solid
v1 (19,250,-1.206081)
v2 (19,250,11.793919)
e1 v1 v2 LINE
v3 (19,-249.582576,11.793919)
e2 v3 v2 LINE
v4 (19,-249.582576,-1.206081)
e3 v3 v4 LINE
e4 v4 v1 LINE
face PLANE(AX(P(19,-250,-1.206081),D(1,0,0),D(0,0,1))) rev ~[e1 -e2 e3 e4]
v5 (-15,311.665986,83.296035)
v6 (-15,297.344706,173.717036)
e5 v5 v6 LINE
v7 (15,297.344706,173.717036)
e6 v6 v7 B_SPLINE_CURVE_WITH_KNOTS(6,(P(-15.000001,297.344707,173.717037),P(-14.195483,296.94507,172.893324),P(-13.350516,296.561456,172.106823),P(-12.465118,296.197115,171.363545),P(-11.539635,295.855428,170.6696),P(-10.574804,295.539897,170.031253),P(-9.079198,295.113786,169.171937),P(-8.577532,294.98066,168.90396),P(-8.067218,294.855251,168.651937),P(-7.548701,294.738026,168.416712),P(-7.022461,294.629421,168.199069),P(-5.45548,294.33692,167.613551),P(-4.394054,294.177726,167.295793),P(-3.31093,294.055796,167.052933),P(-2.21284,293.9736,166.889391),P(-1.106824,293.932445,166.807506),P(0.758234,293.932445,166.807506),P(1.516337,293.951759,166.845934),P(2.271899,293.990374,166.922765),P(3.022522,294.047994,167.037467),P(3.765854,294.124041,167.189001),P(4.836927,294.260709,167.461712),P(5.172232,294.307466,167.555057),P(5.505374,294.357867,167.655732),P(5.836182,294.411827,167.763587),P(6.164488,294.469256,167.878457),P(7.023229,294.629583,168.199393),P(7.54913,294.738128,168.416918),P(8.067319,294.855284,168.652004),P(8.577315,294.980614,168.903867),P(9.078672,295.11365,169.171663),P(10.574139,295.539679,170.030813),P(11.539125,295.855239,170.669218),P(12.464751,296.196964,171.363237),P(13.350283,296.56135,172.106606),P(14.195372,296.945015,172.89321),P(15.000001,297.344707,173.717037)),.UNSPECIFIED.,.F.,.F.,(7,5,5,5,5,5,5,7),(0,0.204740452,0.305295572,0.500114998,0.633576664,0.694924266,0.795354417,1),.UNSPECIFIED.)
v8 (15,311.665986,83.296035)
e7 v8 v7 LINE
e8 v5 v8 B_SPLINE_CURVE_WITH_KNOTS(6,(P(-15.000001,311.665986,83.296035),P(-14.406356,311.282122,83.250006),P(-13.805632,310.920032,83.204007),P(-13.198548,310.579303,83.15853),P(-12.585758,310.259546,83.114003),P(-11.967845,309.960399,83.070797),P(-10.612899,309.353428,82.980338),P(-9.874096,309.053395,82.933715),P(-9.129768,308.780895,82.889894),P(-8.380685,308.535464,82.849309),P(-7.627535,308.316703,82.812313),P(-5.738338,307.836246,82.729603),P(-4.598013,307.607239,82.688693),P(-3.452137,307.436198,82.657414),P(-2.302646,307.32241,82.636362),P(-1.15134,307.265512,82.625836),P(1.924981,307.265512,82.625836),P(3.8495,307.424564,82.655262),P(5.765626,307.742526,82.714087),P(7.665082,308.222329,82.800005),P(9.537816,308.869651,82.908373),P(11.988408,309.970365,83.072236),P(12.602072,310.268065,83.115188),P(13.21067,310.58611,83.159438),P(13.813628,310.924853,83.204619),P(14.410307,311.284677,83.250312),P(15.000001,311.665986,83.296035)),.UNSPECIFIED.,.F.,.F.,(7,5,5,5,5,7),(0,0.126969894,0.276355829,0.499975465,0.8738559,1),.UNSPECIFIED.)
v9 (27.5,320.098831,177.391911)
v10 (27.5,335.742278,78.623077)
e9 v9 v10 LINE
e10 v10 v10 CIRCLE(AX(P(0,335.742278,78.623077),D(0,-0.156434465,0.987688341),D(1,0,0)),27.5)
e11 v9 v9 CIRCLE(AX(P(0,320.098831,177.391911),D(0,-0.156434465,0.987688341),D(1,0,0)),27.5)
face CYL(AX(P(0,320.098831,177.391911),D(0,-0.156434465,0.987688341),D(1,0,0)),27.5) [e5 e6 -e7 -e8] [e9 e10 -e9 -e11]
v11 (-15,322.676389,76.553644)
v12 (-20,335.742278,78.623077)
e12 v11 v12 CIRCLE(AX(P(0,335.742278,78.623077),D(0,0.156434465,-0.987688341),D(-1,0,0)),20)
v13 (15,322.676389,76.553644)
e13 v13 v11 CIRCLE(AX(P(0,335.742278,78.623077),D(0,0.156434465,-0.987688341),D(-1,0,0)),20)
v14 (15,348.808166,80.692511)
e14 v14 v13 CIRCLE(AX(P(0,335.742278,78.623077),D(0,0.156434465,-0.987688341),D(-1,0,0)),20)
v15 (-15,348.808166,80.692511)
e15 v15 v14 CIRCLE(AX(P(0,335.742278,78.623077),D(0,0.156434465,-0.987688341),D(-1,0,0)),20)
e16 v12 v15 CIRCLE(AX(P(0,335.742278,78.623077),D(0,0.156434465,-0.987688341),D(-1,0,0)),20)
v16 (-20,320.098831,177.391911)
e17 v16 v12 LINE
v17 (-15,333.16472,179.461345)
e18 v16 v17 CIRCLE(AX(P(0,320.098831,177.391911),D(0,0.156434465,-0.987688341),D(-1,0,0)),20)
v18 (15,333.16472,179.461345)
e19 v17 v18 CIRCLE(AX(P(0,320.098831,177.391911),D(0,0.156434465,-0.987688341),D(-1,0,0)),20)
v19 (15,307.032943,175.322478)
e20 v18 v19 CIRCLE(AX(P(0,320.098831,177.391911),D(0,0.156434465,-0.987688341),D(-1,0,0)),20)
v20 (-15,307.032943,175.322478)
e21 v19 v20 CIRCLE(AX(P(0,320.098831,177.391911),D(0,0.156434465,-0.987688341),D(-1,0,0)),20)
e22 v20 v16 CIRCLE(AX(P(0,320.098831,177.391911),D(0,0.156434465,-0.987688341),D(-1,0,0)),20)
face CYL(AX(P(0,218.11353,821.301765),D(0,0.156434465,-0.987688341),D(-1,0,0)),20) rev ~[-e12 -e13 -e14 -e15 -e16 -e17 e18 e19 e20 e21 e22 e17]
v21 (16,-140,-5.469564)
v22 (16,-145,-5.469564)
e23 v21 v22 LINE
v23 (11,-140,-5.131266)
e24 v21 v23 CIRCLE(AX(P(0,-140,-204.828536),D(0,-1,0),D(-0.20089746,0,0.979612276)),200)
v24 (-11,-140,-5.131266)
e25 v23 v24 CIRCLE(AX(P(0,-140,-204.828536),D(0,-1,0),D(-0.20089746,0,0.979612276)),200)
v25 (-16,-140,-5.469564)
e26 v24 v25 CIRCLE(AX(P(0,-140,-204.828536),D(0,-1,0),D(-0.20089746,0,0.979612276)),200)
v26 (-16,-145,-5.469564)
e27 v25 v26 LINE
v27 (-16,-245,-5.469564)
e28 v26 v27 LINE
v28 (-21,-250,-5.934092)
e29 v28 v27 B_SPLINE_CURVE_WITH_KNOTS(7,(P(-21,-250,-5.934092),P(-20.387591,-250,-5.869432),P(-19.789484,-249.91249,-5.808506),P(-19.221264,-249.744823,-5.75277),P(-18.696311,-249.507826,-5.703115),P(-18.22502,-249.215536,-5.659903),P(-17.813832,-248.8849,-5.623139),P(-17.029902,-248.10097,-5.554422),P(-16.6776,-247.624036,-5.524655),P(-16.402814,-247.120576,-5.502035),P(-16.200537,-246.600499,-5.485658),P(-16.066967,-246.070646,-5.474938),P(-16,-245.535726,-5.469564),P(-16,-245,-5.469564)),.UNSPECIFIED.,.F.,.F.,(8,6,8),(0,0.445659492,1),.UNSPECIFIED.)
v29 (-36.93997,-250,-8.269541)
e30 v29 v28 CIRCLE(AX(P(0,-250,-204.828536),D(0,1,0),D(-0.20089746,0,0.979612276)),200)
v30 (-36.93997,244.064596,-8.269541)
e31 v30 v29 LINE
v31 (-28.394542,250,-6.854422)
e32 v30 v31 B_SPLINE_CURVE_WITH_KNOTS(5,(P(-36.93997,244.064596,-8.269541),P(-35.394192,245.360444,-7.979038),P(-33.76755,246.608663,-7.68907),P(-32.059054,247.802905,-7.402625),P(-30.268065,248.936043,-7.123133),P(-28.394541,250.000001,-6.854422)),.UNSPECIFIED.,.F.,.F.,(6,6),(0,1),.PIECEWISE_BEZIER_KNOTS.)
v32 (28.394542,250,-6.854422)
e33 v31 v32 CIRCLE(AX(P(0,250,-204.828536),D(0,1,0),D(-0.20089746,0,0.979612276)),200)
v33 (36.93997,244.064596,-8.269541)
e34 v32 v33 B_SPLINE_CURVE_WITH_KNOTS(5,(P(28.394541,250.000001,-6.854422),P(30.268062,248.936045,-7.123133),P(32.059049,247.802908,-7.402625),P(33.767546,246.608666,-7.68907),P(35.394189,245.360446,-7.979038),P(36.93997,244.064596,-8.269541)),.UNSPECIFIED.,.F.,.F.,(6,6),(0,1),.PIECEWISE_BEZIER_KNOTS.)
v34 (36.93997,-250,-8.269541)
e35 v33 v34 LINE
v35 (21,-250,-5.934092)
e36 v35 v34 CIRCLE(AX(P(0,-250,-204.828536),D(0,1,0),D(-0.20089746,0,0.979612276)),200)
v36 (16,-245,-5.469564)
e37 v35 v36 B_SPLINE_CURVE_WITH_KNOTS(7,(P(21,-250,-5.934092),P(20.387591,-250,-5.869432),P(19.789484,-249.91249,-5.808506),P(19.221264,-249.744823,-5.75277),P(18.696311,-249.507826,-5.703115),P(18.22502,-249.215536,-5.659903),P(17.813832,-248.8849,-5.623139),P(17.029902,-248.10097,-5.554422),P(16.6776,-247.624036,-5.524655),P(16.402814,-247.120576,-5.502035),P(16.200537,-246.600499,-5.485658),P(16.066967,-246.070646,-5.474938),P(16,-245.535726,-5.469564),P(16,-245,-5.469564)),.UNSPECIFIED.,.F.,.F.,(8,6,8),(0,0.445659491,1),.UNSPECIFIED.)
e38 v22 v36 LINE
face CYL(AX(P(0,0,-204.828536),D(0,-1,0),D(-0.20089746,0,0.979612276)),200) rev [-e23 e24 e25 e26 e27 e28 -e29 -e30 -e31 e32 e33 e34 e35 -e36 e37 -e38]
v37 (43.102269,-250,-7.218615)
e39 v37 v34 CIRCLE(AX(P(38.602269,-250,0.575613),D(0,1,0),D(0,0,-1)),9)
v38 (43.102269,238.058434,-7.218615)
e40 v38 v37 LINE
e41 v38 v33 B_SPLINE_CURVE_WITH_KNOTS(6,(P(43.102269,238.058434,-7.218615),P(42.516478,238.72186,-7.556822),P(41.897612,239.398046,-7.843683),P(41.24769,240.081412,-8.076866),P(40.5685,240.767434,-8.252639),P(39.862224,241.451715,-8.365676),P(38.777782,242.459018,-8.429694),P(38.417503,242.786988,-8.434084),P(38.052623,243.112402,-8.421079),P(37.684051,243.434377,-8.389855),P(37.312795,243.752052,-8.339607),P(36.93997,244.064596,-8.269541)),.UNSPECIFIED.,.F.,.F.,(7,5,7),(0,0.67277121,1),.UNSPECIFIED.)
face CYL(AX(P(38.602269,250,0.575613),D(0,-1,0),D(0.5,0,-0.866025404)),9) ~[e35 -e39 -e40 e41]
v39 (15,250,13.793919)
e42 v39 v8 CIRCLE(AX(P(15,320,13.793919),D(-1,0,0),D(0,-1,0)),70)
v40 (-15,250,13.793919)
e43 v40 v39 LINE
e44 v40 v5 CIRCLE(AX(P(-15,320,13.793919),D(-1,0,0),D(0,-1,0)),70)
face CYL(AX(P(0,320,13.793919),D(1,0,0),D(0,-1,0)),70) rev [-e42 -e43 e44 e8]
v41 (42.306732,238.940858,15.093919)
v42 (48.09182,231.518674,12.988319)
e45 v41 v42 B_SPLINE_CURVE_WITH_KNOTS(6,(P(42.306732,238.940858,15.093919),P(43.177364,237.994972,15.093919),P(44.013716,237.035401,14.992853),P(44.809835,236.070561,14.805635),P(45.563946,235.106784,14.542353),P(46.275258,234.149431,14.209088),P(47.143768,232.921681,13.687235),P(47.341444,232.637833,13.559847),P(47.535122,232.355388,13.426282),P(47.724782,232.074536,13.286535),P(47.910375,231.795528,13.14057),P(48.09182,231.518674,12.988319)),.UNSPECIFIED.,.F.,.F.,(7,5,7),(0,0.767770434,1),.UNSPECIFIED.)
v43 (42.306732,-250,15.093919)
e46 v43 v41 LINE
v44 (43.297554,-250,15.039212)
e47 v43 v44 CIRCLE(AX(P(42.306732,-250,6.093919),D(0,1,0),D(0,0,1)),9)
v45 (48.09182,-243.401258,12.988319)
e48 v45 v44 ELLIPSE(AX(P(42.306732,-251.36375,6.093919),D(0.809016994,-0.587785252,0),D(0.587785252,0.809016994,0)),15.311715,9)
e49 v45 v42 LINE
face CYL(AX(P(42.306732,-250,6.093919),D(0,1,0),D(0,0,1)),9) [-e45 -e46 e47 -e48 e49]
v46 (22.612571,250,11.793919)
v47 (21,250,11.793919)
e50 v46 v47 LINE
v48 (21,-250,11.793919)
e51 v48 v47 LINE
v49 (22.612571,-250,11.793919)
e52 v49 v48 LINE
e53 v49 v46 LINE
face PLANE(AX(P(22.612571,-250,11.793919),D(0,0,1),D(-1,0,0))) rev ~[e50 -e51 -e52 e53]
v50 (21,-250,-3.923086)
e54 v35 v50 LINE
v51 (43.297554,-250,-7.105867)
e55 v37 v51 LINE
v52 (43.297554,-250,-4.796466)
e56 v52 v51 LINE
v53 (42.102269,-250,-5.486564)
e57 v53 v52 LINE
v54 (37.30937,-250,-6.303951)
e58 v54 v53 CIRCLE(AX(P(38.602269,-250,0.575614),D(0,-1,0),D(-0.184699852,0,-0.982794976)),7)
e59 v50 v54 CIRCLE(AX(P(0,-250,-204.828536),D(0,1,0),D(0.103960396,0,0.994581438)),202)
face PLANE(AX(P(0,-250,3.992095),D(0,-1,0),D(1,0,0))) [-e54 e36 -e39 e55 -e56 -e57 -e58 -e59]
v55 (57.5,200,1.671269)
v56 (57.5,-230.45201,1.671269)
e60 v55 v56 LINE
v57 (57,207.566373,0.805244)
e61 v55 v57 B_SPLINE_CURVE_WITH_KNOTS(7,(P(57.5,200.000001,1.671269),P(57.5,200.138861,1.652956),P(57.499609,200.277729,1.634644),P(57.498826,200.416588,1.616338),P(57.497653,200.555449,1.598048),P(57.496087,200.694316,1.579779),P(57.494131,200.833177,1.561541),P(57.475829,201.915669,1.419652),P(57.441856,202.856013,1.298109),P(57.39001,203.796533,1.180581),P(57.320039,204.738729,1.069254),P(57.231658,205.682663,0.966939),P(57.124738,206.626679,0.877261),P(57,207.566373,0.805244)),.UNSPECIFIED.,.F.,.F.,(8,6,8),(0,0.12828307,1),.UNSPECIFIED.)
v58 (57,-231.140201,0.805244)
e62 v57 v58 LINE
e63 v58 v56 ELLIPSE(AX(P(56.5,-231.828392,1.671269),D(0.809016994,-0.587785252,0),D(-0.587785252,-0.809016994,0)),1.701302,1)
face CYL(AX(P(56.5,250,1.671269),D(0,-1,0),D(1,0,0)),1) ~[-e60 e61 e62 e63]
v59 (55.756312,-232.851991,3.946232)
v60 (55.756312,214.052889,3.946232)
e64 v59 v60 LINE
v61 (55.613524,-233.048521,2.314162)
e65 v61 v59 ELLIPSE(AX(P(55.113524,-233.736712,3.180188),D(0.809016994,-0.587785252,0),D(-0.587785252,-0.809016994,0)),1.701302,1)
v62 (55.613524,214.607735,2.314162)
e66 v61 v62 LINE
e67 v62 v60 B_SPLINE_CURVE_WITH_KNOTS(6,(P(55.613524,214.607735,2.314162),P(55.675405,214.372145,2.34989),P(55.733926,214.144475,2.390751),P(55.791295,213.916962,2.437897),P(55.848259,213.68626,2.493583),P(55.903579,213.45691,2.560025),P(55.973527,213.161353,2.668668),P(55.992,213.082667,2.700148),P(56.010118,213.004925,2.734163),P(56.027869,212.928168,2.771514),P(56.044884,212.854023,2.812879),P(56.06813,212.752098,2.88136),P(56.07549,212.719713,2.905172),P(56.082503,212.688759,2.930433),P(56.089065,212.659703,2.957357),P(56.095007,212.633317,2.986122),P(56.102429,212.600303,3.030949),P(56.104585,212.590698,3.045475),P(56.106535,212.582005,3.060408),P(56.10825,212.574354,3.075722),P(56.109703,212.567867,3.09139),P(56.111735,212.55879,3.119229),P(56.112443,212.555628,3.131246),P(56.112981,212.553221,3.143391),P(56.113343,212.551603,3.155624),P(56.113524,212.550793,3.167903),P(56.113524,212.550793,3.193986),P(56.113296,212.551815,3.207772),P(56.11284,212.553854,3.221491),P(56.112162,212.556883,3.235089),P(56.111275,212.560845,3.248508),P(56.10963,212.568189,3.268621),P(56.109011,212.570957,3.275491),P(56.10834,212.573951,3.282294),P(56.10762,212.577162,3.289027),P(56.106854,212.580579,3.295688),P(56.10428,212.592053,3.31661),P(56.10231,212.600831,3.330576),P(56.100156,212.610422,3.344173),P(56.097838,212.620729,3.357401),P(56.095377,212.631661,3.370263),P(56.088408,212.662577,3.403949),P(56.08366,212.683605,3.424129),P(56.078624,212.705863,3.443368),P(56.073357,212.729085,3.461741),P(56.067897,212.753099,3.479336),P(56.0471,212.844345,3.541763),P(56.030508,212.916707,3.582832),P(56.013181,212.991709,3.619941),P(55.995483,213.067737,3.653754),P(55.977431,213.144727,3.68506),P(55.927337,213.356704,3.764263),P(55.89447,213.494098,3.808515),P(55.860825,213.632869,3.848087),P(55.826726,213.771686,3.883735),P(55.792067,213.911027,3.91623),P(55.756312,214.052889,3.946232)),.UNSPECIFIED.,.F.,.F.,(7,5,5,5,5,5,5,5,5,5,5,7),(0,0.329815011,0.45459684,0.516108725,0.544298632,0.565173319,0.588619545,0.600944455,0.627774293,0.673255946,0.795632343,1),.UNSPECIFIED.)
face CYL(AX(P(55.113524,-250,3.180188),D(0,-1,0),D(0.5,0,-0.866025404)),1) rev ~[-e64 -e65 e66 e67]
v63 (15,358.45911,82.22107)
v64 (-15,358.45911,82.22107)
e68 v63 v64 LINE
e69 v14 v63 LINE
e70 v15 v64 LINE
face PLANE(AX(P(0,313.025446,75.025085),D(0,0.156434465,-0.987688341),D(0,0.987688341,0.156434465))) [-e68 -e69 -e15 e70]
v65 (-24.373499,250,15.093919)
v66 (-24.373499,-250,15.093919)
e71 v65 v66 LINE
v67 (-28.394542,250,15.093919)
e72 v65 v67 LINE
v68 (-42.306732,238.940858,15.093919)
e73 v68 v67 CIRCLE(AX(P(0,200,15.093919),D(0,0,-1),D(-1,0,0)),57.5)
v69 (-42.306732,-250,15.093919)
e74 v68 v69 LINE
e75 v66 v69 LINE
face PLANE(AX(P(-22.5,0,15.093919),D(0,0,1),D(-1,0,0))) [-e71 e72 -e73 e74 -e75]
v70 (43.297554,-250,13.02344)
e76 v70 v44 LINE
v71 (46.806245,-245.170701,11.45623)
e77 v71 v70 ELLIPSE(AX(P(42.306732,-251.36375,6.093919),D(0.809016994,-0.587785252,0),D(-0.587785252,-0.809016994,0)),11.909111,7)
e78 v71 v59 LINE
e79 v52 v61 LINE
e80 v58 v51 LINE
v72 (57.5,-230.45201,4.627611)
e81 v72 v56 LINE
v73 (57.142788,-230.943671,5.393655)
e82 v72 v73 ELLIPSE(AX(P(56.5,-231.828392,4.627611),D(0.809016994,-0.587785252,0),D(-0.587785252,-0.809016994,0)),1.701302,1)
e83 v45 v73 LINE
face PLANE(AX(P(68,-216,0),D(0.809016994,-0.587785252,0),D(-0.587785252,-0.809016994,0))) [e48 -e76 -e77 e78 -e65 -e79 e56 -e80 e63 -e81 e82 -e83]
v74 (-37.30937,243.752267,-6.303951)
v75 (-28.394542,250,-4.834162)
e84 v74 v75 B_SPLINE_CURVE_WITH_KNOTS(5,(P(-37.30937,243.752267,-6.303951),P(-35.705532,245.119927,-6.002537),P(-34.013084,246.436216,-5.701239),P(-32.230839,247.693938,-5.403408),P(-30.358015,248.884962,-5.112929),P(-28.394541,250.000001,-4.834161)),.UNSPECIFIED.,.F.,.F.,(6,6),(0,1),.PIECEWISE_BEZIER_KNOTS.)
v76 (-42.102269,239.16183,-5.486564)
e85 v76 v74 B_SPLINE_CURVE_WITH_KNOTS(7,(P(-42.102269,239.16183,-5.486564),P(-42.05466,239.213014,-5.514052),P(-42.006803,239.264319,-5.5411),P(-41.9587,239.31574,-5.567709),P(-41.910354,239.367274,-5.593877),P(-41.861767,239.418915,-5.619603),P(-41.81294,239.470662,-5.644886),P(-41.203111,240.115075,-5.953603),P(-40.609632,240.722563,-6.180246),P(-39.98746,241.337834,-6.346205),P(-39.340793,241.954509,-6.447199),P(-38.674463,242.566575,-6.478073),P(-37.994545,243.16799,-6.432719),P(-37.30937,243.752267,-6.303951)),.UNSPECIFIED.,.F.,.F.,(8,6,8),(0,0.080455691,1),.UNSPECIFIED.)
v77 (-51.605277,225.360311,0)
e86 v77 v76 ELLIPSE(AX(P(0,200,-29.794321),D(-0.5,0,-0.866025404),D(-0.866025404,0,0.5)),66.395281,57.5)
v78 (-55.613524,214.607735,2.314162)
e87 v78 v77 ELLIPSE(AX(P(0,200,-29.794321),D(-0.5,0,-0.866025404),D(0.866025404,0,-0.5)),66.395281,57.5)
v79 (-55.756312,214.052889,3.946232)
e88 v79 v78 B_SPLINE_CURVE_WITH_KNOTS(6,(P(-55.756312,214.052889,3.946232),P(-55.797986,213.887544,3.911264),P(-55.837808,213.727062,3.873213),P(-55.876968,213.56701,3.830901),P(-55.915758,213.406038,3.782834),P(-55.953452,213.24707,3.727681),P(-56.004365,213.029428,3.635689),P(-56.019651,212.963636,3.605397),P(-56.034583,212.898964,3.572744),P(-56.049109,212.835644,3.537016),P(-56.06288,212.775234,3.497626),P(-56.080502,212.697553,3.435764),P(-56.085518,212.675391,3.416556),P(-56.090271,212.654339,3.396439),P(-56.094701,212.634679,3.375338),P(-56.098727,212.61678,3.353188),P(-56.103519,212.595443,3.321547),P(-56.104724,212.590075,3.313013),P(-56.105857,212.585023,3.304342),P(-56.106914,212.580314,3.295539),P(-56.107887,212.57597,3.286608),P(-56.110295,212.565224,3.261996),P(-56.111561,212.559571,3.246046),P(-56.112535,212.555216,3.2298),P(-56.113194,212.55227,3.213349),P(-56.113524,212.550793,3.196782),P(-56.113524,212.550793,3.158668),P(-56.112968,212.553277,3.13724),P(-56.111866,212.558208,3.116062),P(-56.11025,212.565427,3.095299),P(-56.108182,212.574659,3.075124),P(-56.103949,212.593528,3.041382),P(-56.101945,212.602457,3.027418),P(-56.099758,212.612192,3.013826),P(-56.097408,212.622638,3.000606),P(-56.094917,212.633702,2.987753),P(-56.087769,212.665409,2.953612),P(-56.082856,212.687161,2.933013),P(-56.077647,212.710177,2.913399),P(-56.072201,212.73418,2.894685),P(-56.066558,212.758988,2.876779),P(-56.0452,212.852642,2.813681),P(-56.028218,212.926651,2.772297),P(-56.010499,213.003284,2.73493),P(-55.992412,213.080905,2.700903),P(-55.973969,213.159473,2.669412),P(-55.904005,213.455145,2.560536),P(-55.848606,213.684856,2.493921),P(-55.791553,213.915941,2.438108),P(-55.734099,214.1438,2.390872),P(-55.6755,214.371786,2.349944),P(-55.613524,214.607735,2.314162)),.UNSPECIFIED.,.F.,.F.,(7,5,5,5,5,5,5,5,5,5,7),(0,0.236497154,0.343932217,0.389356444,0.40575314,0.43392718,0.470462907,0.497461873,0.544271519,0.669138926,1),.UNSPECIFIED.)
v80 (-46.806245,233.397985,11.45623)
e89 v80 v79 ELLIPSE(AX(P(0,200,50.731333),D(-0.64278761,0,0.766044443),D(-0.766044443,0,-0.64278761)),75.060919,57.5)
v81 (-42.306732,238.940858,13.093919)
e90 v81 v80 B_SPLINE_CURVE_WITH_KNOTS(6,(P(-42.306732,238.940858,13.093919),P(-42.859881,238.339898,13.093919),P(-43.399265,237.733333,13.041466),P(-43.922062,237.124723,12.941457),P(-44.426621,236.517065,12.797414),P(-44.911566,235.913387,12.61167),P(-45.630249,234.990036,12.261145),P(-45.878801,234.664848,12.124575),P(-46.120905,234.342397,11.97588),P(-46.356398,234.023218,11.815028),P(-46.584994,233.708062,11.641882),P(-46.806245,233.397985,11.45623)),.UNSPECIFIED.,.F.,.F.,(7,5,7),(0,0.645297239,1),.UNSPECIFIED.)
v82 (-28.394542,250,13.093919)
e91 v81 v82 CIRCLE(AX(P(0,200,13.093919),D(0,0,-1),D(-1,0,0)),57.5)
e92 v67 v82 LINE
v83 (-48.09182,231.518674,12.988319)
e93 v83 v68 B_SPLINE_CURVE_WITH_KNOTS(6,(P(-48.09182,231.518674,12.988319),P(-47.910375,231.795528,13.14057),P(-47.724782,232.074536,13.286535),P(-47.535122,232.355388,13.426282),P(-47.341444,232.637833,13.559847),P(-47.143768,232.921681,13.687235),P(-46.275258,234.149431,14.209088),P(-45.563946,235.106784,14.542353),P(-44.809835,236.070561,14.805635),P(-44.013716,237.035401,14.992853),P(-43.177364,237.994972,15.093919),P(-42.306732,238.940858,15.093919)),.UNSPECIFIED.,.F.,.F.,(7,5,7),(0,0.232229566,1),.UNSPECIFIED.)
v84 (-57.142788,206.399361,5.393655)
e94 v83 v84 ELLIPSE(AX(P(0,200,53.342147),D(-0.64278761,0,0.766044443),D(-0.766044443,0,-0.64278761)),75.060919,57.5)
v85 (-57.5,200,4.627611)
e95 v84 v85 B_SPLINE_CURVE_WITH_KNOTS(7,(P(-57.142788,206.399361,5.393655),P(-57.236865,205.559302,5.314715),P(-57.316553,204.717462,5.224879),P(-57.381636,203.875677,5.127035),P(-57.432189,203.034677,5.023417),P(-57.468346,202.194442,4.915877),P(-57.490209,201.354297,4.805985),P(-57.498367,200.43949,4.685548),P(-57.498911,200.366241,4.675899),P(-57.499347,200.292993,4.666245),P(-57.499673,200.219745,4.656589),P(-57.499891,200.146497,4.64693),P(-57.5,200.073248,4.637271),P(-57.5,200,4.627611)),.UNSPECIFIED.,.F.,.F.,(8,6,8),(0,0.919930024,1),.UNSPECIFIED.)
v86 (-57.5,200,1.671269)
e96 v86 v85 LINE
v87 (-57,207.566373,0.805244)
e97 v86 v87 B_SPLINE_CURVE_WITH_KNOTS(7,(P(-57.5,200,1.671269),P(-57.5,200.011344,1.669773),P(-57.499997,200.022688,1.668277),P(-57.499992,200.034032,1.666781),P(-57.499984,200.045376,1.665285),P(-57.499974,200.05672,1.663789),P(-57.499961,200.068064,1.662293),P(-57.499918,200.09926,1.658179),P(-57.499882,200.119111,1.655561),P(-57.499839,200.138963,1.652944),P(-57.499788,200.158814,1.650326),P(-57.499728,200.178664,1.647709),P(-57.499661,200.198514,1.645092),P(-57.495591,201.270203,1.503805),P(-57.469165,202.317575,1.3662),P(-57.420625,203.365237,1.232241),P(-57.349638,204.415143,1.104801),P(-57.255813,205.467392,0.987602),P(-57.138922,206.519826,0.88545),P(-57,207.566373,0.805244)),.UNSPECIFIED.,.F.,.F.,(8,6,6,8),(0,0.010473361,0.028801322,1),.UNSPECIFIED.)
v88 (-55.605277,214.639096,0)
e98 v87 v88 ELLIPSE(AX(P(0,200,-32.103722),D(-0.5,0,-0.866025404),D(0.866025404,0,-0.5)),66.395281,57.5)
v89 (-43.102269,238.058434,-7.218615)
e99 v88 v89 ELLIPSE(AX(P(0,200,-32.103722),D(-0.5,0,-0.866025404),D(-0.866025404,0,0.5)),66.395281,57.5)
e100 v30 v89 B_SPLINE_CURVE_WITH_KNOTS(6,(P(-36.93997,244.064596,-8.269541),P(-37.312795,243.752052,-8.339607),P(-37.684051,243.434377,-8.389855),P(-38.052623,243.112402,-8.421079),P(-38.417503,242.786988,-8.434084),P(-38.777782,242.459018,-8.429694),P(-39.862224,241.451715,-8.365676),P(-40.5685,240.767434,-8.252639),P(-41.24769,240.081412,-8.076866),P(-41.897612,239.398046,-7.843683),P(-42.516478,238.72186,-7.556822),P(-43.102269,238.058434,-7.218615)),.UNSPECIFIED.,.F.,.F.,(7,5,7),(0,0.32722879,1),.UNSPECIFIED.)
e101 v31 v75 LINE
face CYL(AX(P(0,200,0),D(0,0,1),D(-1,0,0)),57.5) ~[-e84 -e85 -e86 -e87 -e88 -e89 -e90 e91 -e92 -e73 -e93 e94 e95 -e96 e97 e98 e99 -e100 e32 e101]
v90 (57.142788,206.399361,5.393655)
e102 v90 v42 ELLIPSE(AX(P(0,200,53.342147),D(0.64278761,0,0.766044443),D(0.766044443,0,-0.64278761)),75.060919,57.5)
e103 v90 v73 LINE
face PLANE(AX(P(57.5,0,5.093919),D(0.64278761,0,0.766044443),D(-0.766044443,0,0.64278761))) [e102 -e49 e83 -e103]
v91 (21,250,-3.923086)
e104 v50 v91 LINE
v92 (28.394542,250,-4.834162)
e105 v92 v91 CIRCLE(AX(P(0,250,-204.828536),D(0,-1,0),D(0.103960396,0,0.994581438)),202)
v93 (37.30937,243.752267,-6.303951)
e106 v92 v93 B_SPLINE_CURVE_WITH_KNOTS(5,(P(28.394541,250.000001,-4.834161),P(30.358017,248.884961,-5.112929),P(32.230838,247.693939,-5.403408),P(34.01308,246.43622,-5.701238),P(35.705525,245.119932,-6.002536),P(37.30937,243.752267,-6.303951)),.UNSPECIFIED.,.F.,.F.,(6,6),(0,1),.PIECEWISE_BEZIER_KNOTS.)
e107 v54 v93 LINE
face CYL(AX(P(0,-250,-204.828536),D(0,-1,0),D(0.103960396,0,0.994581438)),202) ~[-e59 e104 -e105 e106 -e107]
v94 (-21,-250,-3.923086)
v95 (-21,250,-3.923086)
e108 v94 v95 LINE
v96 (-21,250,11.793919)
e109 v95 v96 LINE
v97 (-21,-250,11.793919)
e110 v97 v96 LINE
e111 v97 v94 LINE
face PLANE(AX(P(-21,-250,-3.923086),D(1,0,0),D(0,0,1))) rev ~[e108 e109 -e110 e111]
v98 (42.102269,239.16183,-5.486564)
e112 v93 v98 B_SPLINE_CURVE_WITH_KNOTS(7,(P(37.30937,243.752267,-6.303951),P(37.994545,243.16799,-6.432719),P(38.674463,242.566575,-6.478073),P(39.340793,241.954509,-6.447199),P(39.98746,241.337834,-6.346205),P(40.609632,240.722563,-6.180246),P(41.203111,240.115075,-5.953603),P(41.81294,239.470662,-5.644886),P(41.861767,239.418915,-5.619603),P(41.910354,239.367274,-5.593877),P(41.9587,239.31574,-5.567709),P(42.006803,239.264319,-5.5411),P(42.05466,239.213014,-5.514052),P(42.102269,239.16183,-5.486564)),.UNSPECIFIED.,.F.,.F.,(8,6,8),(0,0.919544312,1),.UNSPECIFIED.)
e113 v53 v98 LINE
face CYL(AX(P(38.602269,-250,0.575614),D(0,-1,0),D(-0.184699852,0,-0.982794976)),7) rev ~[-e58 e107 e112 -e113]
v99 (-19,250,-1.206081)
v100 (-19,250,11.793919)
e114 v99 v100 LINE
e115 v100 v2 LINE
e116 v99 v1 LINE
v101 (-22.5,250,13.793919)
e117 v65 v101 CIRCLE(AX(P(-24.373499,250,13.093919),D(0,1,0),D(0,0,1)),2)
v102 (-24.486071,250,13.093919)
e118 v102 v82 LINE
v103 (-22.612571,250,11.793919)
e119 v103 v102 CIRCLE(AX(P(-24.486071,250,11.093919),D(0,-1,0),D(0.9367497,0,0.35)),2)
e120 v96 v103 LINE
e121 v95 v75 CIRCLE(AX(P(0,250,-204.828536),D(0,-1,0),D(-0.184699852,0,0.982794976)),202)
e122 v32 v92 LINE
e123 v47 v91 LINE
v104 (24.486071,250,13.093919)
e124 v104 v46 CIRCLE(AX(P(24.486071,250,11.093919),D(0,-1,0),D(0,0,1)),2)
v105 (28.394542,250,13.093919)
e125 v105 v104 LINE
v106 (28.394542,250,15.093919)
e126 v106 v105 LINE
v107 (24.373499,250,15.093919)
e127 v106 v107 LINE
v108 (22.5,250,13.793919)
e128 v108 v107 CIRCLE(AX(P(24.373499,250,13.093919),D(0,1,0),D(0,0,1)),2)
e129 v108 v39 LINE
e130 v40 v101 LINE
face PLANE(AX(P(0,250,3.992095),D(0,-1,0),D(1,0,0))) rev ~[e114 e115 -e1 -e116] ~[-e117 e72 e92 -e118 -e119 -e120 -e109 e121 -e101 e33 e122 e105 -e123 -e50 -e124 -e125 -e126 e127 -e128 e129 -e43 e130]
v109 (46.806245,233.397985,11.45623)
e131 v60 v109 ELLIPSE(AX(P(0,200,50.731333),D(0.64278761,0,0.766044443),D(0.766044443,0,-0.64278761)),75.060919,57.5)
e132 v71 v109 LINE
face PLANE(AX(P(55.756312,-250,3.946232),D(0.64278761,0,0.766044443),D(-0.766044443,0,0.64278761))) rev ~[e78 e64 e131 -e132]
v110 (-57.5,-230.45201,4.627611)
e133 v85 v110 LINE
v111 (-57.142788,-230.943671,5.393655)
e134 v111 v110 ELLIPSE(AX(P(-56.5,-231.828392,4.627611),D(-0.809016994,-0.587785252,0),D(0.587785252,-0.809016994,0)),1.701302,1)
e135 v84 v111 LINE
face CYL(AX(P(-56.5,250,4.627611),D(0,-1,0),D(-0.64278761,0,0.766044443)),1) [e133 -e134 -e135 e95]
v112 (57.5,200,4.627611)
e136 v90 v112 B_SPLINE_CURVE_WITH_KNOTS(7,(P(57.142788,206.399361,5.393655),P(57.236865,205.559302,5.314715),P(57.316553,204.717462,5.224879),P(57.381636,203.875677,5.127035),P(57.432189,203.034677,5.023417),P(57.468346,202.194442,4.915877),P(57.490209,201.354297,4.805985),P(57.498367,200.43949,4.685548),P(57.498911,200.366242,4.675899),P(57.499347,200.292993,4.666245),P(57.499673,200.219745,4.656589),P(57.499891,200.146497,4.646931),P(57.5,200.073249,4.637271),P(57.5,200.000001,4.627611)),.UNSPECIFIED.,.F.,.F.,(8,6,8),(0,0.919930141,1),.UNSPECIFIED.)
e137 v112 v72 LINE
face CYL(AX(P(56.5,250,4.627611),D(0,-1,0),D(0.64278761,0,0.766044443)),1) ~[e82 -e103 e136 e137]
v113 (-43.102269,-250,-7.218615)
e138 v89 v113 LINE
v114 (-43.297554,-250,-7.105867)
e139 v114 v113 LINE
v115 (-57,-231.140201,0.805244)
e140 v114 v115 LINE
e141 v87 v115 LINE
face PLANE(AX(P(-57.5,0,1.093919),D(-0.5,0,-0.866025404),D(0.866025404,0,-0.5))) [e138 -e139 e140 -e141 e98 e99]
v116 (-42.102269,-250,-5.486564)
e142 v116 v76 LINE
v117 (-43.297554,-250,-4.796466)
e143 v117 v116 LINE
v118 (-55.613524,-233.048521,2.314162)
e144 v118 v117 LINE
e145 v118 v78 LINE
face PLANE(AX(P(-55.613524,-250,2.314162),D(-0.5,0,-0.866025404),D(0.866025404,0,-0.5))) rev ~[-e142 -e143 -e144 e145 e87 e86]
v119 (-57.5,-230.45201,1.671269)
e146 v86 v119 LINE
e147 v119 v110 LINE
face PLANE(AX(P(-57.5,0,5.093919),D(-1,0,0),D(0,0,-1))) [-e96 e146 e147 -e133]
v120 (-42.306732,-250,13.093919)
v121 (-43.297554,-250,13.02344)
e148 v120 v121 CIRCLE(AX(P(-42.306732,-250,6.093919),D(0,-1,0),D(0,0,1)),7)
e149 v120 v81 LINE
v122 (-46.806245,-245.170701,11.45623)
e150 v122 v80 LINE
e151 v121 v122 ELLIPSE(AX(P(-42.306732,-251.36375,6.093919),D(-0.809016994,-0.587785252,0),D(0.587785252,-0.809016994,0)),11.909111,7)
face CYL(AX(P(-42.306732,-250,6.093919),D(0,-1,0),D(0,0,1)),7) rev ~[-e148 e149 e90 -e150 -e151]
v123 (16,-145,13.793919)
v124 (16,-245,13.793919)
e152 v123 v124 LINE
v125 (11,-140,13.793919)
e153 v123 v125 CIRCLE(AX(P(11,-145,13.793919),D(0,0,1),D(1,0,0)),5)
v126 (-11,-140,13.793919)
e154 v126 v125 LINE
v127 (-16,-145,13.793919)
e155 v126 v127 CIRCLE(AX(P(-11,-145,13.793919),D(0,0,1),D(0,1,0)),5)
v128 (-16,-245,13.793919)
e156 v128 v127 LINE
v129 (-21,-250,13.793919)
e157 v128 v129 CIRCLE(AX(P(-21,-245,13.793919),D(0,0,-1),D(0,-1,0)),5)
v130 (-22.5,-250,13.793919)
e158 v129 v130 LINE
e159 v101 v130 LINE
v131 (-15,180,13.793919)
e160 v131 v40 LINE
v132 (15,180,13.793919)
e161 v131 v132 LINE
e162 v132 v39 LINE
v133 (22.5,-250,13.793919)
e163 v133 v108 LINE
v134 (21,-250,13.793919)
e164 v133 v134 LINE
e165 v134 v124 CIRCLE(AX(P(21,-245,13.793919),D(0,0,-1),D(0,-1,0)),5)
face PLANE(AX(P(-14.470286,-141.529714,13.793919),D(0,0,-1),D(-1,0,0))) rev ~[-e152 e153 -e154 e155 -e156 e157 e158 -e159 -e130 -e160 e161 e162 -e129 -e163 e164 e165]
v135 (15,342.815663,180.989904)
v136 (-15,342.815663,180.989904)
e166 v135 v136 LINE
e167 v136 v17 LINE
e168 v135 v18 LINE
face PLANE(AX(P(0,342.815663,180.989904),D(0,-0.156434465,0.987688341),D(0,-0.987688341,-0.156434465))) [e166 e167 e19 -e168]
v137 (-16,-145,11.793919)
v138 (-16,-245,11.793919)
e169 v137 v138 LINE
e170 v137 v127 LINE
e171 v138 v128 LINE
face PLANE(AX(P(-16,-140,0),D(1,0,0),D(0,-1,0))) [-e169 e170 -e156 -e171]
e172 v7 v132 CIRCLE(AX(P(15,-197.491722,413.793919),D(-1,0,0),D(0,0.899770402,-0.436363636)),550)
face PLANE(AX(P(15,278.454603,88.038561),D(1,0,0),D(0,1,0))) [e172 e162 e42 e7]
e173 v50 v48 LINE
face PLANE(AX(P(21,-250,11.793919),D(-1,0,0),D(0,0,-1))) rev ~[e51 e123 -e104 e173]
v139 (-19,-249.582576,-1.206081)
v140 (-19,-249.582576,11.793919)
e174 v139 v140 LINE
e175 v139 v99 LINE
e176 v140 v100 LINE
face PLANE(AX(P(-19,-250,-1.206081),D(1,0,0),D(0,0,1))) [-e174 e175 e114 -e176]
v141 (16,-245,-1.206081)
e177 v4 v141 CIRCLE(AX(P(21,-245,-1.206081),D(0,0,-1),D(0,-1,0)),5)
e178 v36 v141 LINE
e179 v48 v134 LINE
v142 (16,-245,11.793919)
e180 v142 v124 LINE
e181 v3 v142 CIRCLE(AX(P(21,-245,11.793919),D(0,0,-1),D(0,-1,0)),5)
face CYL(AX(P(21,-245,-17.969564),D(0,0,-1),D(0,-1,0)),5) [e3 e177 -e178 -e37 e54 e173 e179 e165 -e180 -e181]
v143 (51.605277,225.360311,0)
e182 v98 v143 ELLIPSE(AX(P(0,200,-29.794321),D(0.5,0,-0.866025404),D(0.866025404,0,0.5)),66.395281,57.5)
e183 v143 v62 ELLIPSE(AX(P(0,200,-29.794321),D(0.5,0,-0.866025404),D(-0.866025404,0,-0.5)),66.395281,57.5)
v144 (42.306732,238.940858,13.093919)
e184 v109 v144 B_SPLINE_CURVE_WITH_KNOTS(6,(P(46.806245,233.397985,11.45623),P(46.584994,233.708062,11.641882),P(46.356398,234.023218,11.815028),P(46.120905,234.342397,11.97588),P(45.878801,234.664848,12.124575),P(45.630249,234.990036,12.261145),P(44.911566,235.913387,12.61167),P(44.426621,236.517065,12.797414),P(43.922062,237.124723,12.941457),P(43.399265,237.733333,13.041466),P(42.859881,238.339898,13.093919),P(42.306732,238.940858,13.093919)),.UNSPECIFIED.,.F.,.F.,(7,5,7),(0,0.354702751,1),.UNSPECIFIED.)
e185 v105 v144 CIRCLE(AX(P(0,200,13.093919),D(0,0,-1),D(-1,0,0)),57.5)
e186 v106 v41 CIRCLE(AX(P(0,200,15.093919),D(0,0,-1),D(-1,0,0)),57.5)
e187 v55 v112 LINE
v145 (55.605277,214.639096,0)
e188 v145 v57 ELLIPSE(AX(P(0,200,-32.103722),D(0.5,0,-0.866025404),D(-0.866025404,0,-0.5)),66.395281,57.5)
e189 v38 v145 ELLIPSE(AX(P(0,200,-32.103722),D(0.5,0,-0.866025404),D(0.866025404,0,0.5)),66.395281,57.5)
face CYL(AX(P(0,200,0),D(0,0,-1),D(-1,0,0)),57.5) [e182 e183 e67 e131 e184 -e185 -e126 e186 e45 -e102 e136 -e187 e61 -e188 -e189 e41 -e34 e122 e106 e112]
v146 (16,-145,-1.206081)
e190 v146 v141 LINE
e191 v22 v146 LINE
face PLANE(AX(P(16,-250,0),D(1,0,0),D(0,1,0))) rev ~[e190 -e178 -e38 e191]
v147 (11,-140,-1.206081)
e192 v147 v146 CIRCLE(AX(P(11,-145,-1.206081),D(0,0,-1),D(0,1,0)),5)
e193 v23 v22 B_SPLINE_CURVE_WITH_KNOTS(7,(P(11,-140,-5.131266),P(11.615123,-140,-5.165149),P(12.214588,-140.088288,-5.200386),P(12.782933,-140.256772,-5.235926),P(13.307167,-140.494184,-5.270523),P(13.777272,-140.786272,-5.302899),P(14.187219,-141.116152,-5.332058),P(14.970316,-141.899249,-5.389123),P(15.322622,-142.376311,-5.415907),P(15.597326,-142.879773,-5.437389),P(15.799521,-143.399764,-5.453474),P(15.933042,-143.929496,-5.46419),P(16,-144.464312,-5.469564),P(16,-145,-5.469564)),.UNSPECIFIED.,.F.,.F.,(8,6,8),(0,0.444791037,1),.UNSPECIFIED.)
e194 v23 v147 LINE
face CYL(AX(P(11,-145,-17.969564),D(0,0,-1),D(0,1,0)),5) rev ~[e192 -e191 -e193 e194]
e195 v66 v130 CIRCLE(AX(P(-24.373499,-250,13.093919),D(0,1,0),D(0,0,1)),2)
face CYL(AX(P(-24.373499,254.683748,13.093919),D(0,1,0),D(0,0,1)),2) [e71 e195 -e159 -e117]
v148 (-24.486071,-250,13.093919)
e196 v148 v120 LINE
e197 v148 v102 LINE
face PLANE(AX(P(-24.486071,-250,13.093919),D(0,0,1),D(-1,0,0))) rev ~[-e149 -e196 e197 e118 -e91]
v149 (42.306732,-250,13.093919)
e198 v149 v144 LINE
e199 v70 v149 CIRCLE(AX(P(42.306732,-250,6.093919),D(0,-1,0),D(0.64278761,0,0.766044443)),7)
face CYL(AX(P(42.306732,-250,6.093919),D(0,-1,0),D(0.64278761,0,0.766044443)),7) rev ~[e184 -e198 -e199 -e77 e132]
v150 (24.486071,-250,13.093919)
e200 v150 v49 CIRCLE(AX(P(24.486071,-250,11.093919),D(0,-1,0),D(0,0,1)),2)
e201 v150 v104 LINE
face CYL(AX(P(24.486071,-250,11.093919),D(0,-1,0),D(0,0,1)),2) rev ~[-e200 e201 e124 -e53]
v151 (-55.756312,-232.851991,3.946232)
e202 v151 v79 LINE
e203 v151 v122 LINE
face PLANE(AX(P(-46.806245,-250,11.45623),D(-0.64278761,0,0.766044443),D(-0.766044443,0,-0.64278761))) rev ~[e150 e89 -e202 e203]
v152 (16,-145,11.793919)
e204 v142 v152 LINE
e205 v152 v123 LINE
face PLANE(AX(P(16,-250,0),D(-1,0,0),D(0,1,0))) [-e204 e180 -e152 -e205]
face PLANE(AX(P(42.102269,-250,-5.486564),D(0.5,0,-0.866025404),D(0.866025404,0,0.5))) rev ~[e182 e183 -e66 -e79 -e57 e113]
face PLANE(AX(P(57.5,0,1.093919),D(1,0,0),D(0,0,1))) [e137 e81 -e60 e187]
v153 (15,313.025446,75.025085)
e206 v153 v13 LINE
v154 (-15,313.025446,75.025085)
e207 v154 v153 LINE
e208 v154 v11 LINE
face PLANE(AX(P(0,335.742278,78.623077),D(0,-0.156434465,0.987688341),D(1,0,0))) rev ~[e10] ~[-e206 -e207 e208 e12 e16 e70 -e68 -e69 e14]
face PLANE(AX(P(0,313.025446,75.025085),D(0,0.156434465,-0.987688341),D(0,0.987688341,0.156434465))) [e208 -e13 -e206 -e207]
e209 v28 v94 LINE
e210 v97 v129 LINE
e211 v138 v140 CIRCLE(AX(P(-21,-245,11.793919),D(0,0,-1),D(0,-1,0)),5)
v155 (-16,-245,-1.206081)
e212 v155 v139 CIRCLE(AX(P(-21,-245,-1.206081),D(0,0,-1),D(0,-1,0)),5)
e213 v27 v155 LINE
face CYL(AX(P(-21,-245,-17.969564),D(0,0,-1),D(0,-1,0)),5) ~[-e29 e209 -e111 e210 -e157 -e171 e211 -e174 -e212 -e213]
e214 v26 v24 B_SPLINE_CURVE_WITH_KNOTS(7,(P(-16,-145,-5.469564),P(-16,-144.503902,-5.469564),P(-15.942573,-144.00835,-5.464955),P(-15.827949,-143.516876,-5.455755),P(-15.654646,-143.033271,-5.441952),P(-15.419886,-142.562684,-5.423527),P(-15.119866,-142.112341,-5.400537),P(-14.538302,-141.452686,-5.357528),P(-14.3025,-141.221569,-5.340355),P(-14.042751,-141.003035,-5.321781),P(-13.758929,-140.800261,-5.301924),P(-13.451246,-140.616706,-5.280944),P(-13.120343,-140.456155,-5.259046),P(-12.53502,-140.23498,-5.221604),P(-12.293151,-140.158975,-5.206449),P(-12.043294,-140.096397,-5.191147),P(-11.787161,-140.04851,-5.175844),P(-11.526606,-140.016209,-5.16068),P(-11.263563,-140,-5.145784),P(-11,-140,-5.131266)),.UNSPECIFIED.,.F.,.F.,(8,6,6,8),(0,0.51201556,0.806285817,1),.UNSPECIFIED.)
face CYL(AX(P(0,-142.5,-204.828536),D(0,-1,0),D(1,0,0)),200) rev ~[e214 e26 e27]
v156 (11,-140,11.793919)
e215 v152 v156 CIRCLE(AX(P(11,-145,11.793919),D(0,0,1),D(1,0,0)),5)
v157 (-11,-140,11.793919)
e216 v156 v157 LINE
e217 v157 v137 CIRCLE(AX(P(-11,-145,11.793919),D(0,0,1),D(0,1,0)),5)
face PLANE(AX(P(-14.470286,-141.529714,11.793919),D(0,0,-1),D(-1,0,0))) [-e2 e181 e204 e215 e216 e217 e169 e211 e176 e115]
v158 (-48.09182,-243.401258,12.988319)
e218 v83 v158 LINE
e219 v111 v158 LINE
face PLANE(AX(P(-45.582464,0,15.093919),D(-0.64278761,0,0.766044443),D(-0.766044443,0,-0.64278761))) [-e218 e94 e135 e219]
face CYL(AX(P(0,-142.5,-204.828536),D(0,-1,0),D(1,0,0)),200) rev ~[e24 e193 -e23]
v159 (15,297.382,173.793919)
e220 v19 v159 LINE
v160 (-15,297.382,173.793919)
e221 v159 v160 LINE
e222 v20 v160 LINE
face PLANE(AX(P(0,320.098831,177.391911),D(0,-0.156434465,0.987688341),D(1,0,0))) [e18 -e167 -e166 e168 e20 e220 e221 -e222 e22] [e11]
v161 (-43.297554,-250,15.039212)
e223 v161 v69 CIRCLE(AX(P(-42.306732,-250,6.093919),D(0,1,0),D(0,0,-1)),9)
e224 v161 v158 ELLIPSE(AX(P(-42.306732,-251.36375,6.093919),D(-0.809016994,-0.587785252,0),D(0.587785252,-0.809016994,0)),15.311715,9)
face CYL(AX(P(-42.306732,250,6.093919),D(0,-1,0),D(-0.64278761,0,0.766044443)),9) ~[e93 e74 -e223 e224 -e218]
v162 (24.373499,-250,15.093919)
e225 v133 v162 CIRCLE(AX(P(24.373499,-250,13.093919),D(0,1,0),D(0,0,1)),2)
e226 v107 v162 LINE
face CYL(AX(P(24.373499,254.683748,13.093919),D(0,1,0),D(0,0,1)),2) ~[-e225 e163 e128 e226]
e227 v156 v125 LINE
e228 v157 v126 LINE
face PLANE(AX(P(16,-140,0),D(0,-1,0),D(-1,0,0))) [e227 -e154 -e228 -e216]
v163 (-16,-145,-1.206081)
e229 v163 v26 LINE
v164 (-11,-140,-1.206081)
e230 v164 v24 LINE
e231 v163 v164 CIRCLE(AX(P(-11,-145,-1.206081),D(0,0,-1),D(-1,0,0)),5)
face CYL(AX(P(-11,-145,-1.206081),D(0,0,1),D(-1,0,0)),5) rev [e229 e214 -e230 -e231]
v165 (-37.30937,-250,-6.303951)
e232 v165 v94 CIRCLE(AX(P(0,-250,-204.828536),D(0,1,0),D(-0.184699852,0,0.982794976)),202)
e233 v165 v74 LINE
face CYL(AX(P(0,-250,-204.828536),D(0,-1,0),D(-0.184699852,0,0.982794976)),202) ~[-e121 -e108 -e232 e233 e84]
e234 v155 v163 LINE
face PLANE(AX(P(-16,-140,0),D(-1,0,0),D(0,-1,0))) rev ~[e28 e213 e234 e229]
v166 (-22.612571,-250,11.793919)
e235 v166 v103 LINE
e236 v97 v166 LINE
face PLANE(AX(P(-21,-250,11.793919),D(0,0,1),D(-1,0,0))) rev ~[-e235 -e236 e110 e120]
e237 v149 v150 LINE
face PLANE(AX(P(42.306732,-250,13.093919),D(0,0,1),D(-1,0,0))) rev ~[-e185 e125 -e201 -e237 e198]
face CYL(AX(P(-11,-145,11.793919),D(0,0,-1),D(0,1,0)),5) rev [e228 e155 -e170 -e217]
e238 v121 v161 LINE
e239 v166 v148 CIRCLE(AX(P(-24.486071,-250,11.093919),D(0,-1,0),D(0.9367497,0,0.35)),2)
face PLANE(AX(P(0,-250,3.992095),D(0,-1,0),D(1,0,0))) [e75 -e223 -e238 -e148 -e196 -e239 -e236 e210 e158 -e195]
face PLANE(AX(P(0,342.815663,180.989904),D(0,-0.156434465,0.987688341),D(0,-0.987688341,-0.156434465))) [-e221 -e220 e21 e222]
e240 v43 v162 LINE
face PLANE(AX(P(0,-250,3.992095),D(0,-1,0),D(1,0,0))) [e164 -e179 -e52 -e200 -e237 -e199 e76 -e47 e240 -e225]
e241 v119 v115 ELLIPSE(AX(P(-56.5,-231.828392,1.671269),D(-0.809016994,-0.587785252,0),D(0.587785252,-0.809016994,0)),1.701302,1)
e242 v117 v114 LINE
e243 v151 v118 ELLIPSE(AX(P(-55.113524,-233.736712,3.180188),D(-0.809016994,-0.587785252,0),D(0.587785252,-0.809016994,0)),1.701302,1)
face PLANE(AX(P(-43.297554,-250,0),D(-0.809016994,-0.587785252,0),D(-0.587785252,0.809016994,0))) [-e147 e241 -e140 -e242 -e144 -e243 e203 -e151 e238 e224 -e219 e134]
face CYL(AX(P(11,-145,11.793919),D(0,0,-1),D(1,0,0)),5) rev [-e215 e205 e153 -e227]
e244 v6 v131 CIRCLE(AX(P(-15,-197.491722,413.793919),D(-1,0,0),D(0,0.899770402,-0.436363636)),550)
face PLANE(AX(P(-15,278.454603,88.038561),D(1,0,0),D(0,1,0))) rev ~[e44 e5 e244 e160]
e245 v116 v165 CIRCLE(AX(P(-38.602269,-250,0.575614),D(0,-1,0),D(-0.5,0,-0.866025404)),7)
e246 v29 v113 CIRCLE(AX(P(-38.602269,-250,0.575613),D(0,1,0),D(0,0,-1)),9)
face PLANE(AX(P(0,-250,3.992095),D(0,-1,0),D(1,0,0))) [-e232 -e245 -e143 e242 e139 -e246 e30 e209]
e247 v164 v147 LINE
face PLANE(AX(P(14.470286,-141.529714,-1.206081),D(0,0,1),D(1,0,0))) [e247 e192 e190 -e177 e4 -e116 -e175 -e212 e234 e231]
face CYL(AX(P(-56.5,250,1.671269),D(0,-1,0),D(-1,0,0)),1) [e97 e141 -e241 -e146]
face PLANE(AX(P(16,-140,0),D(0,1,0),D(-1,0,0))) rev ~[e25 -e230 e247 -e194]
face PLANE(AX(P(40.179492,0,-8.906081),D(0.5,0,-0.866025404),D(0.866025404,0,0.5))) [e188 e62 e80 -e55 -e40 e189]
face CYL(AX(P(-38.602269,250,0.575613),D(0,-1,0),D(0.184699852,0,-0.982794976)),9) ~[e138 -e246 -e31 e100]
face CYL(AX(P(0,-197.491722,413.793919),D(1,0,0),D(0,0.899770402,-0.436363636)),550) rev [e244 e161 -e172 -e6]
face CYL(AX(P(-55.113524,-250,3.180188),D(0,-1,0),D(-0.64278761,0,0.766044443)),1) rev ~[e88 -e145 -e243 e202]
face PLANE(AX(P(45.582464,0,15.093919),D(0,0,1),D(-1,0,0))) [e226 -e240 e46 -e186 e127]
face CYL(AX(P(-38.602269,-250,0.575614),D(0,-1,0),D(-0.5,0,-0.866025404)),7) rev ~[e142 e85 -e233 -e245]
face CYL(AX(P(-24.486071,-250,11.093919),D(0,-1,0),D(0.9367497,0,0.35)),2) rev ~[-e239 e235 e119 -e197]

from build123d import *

# Parameters (mm, degrees)
F1_DEPTH       = 250
F2_W           = 38
F2_H           = 13
F3_DEPTH       = 500.001
F4_T1_DEPTH    = 509.3674969976
F5_R           = 9
F6_R           = 1
F8_DEPTH       = 500.001
F10_DEPTH      = 8.4253865001
F10_DEPTH_BACK = 15.0949186811
F12_DEPTH      = 15
F13_R          = 27.5
F14_DEPTH      = 100
F16_D          = 40
F18_DEPTH      = 8.4253866128
F18_DEPTH_BACK = 181.6948592657
F19_T1_DEPTH   = 2
F19_T6_DEPTH   = 16.7634824315
F19_S7_R       = 200
F19_T8_DEPTH   = 11
F19_T12_DEPTH  = 16.7634824315
F19_S13_R      = 200
F19_T14_DEPTH  = 11
F19_T15_DEPTH  = 27
F19_T17_DEPTH  = 29.2634824315


# Not quite as in the source:
# - a fillet or chamfer that OpenCascade refuses, or shapes differently, is made with other operations: its cross-section is extruded or revolved along the edge and cut away or added


with BuildPart() as f1:
    # F0 (on Front) → F1 (new body, symmetric)
    with BuildSketch(Plane.XZ):
        with BuildLine():
            Line((22.5, 13.7939186811), (0, 13.7939186811))
            Line((0, 13.7939186811), (-22.5, 13.7939186811))
            Line((-22.5, 13.7939186811), (-22.5, 15.0939186811))
            Line((-22.5, 15.0939186811), (-45.5824640741, 15.0939186811))
            Line((-45.5824640741, 15.0939186811), (-57.5, 5.0939186811))
            Line((-57.5, 5.0939186811), (-57.5, 1.0939186811))
            Line((-57.5, 1.0939186811), (-40.1794919243, -8.9060813189))
            ThreePointArc((-40.1794919243, -8.9060813189), (0, -4.8285364604), (40.1794919243, -8.9060813189))
            Line((40.1794919243, -8.9060813189), (57.5, 1.0939186811))
            Line((57.5, 1.0939186811), (57.5, 5.0939186811))
            Line((57.5, 5.0939186811), (45.5824640741, 15.0939186811))
            Line((45.5824640741, 15.0939186811), (22.5, 15.0939186811))
            Line((22.5, 15.0939186811), (22.5, 13.7939186811))
        make_face()
    extrude(amount=F1_DEPTH, both=True)

    # F2 (on face) → F3 (cut, through all)
    with BuildSketch(Plane.XZ.offset(250)):
        with Locations((0, 5.2939186811)):
            Rectangle(F2_W, F2_H)
    extrude(amount=-F3_DEPTH, mode=Mode.SUBTRACT)

    # F4: fillet of radius 2 on 2 edges, made by hand

    # F4_s2 → F4_t1 (cut)
    with BuildSketch(Plane.XZ.offset(-254.6837484988)):
        with BuildLine():
            ThreePointArc((24.3734993995, 15.0939186811), (23.2333239744, 14.7370863537), (22.5, 13.7939186811))
            Line((22.5, 13.7939186811), (22.5, 15.0939186811))
            Line((22.5, 15.0939186811), (24.3734993995, 15.0939186811))
        make_face()
        with BuildLine():
            ThreePointArc((-24.3734993995, 15.0939186811), (-23.2333239744, 14.7370863537), (-22.5, 13.7939186811))
            Line((-22.5, 13.7939186811), (-22.5, 15.0939186811))
            Line((-22.5, 15.0939186811), (-24.3734993995, 15.0939186811))
        make_face()
    extrude(amount=F4_T1_DEPTH, mode=Mode.SUBTRACT)

    # F5
    f5_edges = [f1.edges().sort_by_distance(p)[0] for p in [
        (45.582464, 0, 15.093919),
        (-45.582464, 0, 15.093919),
        (-40.179492, 0, -8.906081),
        (40.179492, 0, -8.906081),
    ]]
    fillet(f5_edges, radius=F5_R)

    # F6
    f6_edges = [f1.edges().sort_by_distance(p)[0] for p in [
        (57.5, 0, 1.093919),
        (57.5, 0, 5.093919),
        (-57.5, 0, 5.093919),
        (-57.5, 0, 1.093919),
    ]]
    fillet(f6_edges, radius=F6_R)

    # F7 (on face) → F8 (cut, through all)
    with BuildSketch(Plane.XZ.offset(250)):
        with BuildLine():
            Line((-55.6135241478, 2.3141624168), (-42.1022690923, -5.4865643266))
            ThreePointArc((-42.1022690923, -5.4865643266), (-39.7790673433, -6.3247593796), (-37.3093701274, -6.3039513313))
            ThreePointArc((-37.3093701274, -6.3039513313), (-29.1789785809, -4.9471035834), (-21, -3.9230860615))
            Line((-21, -3.9230860615), (-21, 11.7939186811))
            Line((-21, 11.7939186811), (-22.6125713953, 11.7939186811))
            ThreePointArc((-22.6125713953, 11.7939186811), (-23.3458953697, 12.7370863537), (-24.4860707948, 13.0939186811))
            Line((-24.4860707948, 13.0939186811), (-42.3067319657, 13.0939186811))
            ThreePointArc((-42.3067319657, 13.0939186811), (-44.7008729689, 12.6717670266), (-46.8062452335, 11.456229783))
            Line((-46.8062452335, 11.456229783), (-55.7563117574, 3.9462322637))
            ThreePointArc((-55.7563117574, 3.9462322637), (-56.1097188459, 3.0930320778), (-55.6135241478, 2.3141624168))
        make_face()
        with BuildLine():
            ThreePointArc((21, -3.9230860615), (29.1789785809, -4.9471035834), (37.3093701274, -6.3039513313))
            ThreePointArc((37.3093701274, -6.3039513313), (39.7790673433, -6.3247593796), (42.1022690923, -5.4865643266))
            Line((42.1022690923, -5.4865643266), (55.6135241478, 2.3141624168))
            ThreePointArc((55.6135241478, 2.3141624168), (56.1097188459, 3.0930320778), (55.7563117574, 3.9462322637))
            Line((55.7563117574, 3.9462322637), (46.8062452335, 11.456229783))
            ThreePointArc((46.8062452335, 11.456229783), (44.7008729689, 12.6717670266), (42.3067319657, 13.0939186811))
            Line((42.3067319657, 13.0939186811), (24.4860707948, 13.0939186811))
            ThreePointArc((24.4860707948, 13.0939186811), (23.3458953697, 12.7370863537), (22.6125713953, 11.7939186811))
            Line((22.6125713953, 11.7939186811), (21, 11.7939186811))
            Line((21, 11.7939186811), (21, -3.9230860615))
        make_face()
    extrude(amount=-F8_DEPTH, mode=Mode.SUBTRACT)

    # F9 (on Top) → F10 (cut, two sides)
    with BuildSketch(Plane.XY) as f10_sk:
        with BuildLine():
            ThreePointArc((-57.5, 200), (0, 257.5), (57.5, 200))
            Line((57.5, 200), (57.5, 280))
            Line((57.5, 280), (-57.5, 280))
            Line((-57.5, 280), (-57.5, 200))
        make_face()
    extrude(amount=-F10_DEPTH, mode=Mode.SUBTRACT)
    extrude(f10_sk.sketch, amount=F10_DEPTH_BACK, mode=Mode.SUBTRACT)

    # F11 (on Right) → F12 (join, symmetric)
    with BuildSketch(Plane.YZ):
        with BuildLine():
            ThreePointArc((297.3819995028, 173.7939186811), (245.9666940414, 88.4561965341), (180, 13.7939186811))
            Line((180, 13.7939186811), (250, 13.7939186811))
            ThreePointArc((250, 13.7939186811), (267.6550746197, 60.2698133678), (311.7145367693, 83.3018398057))
            Line((311.7145367693, 83.3018398057), (313.0254460068, 75.0250846216))
            Line((313.0254460068, 75.0250846216), (358.4591096742, 82.2210700135))
            Line((358.4591096742, 82.2210700135), (342.8156631702, 180.989904073))
            Line((342.8156631702, 180.989904073), (297.3819995028, 173.7939186811))
        make_face()
    extrude(amount=F12_DEPTH, both=True)

    # F13 (on face) → F14 (join, through all)
    with BuildSketch(Plane(origin=(0, -19.5751816724, 123.5928329339), x_dir=(1, 0, 0), z_dir=(0, -0.156434465, 0.9876883406))):
        with Locations((0, 343.9080923079)):
            Circle(F13_R)
    extrude(amount=-F14_DEPTH)

    # F16 (through all)
    with Locations(Plane(origin=(0, -19.5751816724, 123.5928329339), x_dir=(1, 0, 0), z_dir=(0, -0.156434465, 0.9876883406))):
        with Locations((0, 343.9080923079)):
            Hole(F16_D / 2)

    # F17 (on Top) → F18 (cut, two sides)
    with BuildSketch(Plane.XY) as f18_sk:
        Polygon((-43.2975540478, -250), (-68, -216), (-68, -346), (68, -346), (68, -216), (43.2975540478, -250), (16, -250), (16, -140), (-16, -140), (-16, -250), align=None)
    extrude(amount=-F18_DEPTH, mode=Mode.SUBTRACT)
    extrude(f18_sk.sketch, amount=F18_DEPTH_BACK, mode=Mode.SUBTRACT)

    # F19: fillet of radius 5 on 8 edges, made by hand

    # F19_s2 → F19_t1 (join)
    with BuildSketch(Plane.XY.offset(11.7939186811)):
        with BuildLine():
            ThreePointArc((-11, -140), (-14.5355339059, -141.4644660941), (-16, -145))
            Line((-16, -145), (-16, -140))
            Line((-16, -140), (-11, -140))
        make_face()
        with BuildLine():
            ThreePointArc((16, -145), (14.5355339059, -141.4644660941), (11, -140))
            Line((11, -140), (16, -140))
            Line((16, -140), (16, -145))
        make_face()
    extrude(amount=F19_T1_DEPTH)


with BuildPart() as f19_tool4:
    # F19_s5 → F19_t6 (new body)
    with BuildSketch(Plane.XY.offset(-1.2060813189)):
        with BuildLine():
            ThreePointArc((-16, -145), (-14.5355339059, -141.4644660941), (-11, -140))
            Line((-11, -140), (-16, -140))
            Line((-16, -140), (-16, -145))
        make_face()
    extrude(amount=-F19_T6_DEPTH)

    # F19_s7 → F19_t8 (cut, symmetric)
    with BuildSketch(Plane.XZ.offset(142.5)):
        with Locations((0, -204.8285364604)):
            Circle(F19_S7_R)
    extrude(amount=F19_T8_DEPTH, both=True, mode=Mode.SUBTRACT)


with BuildPart() as f1_1:
    add(f1.part)

    # F19_t3: union F19_tool4
    add(f19_tool4.part)


with BuildPart() as f19_tool10:
    # F19_s11 → F19_t12 (new body)
    with BuildSketch(Plane.XY.offset(-17.9695637504)):
        with BuildLine():
            ThreePointArc((11, -140), (14.5355339059, -141.4644660941), (16, -145))
            Line((16, -145), (16, -140))
            Line((16, -140), (11, -140))
        make_face()
    extrude(amount=F19_T12_DEPTH)

    # F19_s13 → F19_t14 (cut, symmetric)
    with BuildSketch(Plane.XZ.offset(142.5)):
        with Locations((0, -204.8285364604)):
            Circle(F19_S13_R)
    extrude(amount=F19_T14_DEPTH, both=True, mode=Mode.SUBTRACT)


with BuildPart() as f1_2:
    add(f1_1.part)

    # F19_t9: union F19_tool10
    add(f19_tool10.part)

    # F19_s16 → F19_t15 (cut)
    with BuildSketch(Plane.XY.offset(-0.7060813189)):
        with BuildLine():
            ThreePointArc((-21, -250), (-17.4644660941, -248.5355339059), (-16, -245))
            Line((-16, -245), (-16, -250))
            Line((-16, -250), (-21, -250))
        make_face()
        with BuildLine():
            ThreePointArc((21, -250), (17.4644660941, -248.5355339059), (16, -245))
            Line((16, -245), (16, -250))
            Line((16, -250), (21, -250))
        make_face()
    extrude(amount=F19_T15_DEPTH, mode=Mode.SUBTRACT)

    # F19_s18 → F19_t17 (cut)
    with BuildSketch(Plane.XY.offset(-17.9695637504)):
        with BuildLine():
            ThreePointArc((21, -250), (17.4644660941, -248.5355339059), (16, -245))
            Line((16, -245), (16, -250))
            Line((16, -250), (21, -250))
        make_face()
        with BuildLine():
            ThreePointArc((-21, -250), (-17.4644660941, -248.5355339059), (-16, -245))
            Line((-16, -245), (-16, -250))
            Line((-16, -250), (-21, -250))
        make_face()
    extrude(amount=F19_T17_DEPTH, mode=Mode.SUBTRACT)


solid = f1_2.part
